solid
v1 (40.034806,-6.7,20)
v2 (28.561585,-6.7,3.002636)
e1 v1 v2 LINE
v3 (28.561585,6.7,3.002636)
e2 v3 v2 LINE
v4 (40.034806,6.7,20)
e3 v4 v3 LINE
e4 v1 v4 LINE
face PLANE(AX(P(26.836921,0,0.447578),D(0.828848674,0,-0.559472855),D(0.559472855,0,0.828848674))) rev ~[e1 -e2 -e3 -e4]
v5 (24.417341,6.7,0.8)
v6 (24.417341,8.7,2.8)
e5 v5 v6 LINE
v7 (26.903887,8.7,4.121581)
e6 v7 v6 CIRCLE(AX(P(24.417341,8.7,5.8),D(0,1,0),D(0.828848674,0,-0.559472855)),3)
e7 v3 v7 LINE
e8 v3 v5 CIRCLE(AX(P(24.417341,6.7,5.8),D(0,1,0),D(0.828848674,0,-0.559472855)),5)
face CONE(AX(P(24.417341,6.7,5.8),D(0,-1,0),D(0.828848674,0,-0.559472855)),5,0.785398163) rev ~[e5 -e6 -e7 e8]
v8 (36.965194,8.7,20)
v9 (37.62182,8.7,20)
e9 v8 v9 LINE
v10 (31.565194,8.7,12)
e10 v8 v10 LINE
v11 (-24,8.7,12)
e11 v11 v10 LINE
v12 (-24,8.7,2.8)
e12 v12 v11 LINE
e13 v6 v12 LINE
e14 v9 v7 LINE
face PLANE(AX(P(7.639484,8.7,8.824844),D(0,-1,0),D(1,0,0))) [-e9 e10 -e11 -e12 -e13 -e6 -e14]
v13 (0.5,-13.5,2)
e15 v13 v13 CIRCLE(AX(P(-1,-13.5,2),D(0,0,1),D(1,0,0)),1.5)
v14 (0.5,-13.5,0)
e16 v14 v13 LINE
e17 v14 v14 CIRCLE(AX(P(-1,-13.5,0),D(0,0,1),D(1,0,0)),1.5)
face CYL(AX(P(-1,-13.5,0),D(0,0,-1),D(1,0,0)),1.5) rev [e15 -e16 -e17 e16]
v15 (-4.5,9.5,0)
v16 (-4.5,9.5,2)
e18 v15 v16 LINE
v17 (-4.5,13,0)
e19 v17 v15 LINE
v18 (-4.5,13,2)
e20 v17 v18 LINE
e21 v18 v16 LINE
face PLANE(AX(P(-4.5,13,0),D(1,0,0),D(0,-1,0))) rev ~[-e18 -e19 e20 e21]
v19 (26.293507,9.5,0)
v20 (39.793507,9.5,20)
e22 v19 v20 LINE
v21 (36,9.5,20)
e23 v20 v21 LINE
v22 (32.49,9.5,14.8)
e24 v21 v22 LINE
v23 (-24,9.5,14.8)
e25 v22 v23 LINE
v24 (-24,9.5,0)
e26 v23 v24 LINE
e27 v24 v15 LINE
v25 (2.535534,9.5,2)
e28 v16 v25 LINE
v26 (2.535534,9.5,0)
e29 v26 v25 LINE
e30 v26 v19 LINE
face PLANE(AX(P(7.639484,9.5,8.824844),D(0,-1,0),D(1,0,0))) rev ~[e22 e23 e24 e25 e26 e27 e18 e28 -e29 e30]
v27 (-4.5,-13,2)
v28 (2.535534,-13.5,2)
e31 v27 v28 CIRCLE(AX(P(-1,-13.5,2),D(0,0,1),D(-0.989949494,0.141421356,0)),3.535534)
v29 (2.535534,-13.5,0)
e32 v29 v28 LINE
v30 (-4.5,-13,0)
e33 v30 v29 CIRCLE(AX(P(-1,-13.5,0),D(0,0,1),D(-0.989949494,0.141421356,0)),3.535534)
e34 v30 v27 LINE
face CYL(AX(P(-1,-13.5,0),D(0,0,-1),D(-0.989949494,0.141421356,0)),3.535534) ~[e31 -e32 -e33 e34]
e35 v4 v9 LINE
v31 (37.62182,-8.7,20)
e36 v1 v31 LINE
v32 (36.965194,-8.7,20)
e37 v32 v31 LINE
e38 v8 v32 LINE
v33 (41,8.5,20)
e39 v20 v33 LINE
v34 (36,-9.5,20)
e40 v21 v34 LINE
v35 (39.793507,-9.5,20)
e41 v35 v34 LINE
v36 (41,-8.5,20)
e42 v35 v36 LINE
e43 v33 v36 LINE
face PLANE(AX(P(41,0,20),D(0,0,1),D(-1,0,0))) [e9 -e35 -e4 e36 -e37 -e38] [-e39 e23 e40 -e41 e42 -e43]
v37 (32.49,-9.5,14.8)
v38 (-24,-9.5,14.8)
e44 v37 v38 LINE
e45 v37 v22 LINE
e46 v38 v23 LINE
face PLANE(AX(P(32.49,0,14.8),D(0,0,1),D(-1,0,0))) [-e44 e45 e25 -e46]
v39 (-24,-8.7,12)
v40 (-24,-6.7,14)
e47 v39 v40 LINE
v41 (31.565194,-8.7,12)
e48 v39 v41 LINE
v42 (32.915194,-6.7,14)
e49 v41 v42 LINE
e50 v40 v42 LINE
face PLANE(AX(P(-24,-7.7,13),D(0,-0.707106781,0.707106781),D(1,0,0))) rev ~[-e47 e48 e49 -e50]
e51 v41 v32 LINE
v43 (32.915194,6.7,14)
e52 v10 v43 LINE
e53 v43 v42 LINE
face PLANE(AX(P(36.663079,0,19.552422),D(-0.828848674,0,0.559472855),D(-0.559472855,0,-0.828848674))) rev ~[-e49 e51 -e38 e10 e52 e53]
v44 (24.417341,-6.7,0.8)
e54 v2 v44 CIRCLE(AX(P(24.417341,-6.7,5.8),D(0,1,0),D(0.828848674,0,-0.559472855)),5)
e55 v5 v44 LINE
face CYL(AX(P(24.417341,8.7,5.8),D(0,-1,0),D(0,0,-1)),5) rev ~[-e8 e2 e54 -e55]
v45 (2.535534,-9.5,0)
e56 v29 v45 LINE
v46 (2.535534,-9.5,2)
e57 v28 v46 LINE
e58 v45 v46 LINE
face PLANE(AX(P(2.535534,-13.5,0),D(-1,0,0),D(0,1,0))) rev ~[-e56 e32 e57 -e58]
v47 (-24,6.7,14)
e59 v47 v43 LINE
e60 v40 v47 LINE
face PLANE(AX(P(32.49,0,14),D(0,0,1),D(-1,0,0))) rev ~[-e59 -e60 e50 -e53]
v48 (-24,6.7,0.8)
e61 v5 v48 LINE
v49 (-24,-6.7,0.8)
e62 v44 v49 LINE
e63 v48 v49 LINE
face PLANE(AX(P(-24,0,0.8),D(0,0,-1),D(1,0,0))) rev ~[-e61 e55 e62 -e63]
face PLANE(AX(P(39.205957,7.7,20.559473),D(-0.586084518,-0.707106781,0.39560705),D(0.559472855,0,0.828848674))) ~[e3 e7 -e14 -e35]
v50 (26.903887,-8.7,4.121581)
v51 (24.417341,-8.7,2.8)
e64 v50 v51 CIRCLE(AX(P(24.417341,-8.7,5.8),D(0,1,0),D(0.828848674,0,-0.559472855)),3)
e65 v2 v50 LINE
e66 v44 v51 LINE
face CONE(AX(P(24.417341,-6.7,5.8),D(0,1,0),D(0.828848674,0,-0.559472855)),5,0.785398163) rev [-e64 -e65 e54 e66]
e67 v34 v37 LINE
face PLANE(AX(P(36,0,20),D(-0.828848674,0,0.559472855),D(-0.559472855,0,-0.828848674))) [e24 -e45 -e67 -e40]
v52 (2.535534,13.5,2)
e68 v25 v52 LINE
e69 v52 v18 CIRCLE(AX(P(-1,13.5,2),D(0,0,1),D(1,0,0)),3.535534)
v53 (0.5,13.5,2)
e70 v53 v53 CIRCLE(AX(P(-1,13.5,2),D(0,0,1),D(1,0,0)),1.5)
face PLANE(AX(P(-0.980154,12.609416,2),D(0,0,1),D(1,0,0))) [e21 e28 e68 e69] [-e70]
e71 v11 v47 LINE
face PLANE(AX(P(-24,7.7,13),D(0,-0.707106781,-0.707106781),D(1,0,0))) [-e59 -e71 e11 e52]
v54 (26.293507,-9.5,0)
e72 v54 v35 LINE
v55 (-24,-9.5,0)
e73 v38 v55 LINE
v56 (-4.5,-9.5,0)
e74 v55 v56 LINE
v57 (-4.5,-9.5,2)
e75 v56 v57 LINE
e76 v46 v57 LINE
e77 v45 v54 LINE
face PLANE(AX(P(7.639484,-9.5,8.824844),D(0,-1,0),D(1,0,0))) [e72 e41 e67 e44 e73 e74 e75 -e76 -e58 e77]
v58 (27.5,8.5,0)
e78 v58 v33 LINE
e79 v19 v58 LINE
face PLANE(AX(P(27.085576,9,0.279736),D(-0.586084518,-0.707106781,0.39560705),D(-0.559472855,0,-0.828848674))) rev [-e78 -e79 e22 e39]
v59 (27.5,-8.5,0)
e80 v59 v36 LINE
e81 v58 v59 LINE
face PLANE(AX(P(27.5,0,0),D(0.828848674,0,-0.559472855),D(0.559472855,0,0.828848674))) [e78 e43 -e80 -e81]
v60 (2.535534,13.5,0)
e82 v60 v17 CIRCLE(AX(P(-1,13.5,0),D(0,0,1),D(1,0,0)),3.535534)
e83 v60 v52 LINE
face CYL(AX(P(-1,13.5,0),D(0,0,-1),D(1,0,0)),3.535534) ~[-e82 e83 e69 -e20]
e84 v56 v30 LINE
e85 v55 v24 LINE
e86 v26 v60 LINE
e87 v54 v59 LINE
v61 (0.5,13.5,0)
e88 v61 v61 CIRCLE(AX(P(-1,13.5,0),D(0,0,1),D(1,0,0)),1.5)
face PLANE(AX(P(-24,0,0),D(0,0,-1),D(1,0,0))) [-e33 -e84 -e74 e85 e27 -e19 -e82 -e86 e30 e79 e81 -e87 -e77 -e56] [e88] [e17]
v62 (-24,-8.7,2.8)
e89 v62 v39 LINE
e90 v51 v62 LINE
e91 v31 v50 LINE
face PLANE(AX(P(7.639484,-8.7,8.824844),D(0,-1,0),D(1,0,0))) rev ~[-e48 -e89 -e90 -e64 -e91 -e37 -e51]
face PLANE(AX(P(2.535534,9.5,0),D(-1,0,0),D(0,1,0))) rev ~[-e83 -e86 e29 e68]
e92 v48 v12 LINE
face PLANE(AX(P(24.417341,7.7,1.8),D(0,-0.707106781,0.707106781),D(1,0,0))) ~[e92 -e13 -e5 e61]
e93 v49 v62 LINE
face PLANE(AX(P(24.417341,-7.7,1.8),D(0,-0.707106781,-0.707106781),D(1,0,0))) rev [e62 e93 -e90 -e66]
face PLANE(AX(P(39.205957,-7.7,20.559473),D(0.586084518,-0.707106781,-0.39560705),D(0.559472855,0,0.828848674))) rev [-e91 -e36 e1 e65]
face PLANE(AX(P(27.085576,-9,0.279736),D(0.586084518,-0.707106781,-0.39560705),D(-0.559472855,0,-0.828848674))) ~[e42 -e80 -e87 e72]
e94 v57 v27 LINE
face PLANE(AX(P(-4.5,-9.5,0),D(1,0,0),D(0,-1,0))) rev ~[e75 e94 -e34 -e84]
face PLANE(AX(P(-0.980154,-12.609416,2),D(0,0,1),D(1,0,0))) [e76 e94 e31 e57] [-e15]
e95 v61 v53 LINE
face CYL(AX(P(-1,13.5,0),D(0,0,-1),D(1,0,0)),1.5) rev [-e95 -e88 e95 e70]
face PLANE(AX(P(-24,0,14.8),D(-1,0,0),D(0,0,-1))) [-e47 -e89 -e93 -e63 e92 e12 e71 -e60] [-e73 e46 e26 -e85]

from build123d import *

# Parameters (mm, degrees)
F2_DEPTH = 9.5
F3_T     = -0.8
F4_R     = 5
F5_SIZE  = 2
F0_R     = 1.5
F6_DEPTH = 2
F7_SIZE  = 1


with BuildPart() as f2:
    # F1 (on Front) → F2 (new body, symmetric)
    with BuildSketch(Plane.XZ):
        Polygon((-24, 0), (27.5, 0), (41, 20), (36, 20), (32.49, 14.8), (-24, 14.8), align=None)
    extrude(amount=F2_DEPTH, both=True)

    # F3
    f3_openings = [f2.faces().sort_by_distance(p)[0] for p in [
        (-24, 0, 7.4),
        (38.5, 0, 20),
    ]]
    offset(amount=F3_T, openings=f3_openings, kind=Kind.INTERSECTION)

    # F4
    f4_edges = [f2.edges().sort_by_distance(p)[0] for p in [
        (27.074806, 0, 0.8),
    ]]
    fillet(f4_edges, radius=F4_R)

    # F5
    f5_edges = [f2.edges().sort_by_distance(p)[0] for p in [
        (4.457597, -8.7, 14),
        (4.457597, 8.7, 14),
        (0.208671, 8.7, 0.8),
        (0.208671, -8.7, 0.8),
        (26.763954, 8.7, 1.384866),
        (34.298195, 8.7, 11.501318),
        (26.763954, -8.7, 1.384866),
        (34.298195, -8.7, 11.501318),
    ]]
    chamfer(f5_edges, length=F5_SIZE)

    # F0 (on Top) → F6 (join)
    with BuildSketch(Plane.XY):
        with BuildLine():
            Line((2.5, -9.5), (-4.5, -9.5))
            Line((-4.5, -9.5), (-4.5, -13))
            ThreePointArc((-4.5, -13), (-1.2506305341, -17.0266392409), (2.5355339059, -13.5))
            Line((2.5355339059, -13.5), (2.5355339059, -9.5))
            Line((2.5355339059, -9.5), (2.5, -9.5))
        make_face()
        with Locations((-1, -13.5)):
            Circle(F0_R, mode=Mode.SUBTRACT)
        with BuildLine():
            Line((-4.5, 13), (-4.5, 9.5))
            Line((-4.5, 9.5), (2.5, 9.5))
            Line((2.5, 9.5), (2.5355339059, 9.5))
            Line((2.5355339059, 9.5), (2.5355339059, 13.5))
            ThreePointArc((2.5355339059, 13.5), (-1.2506305341, 17.0266392409), (-4.5, 13))
        make_face()
        with Locations((-1, 13.5)):
            Circle(F0_R, mode=Mode.SUBTRACT)
    extrude(amount=F6_DEPTH)

    # F7
    f7_edges = [f2.edges().sort_by_distance(p)[0] for p in [
        (34.25, 9.5, 10),
        (34.25, -9.5, 10),
    ]]
    chamfer(f7_edges, length=F7_SIZE)


solid = f2.part
